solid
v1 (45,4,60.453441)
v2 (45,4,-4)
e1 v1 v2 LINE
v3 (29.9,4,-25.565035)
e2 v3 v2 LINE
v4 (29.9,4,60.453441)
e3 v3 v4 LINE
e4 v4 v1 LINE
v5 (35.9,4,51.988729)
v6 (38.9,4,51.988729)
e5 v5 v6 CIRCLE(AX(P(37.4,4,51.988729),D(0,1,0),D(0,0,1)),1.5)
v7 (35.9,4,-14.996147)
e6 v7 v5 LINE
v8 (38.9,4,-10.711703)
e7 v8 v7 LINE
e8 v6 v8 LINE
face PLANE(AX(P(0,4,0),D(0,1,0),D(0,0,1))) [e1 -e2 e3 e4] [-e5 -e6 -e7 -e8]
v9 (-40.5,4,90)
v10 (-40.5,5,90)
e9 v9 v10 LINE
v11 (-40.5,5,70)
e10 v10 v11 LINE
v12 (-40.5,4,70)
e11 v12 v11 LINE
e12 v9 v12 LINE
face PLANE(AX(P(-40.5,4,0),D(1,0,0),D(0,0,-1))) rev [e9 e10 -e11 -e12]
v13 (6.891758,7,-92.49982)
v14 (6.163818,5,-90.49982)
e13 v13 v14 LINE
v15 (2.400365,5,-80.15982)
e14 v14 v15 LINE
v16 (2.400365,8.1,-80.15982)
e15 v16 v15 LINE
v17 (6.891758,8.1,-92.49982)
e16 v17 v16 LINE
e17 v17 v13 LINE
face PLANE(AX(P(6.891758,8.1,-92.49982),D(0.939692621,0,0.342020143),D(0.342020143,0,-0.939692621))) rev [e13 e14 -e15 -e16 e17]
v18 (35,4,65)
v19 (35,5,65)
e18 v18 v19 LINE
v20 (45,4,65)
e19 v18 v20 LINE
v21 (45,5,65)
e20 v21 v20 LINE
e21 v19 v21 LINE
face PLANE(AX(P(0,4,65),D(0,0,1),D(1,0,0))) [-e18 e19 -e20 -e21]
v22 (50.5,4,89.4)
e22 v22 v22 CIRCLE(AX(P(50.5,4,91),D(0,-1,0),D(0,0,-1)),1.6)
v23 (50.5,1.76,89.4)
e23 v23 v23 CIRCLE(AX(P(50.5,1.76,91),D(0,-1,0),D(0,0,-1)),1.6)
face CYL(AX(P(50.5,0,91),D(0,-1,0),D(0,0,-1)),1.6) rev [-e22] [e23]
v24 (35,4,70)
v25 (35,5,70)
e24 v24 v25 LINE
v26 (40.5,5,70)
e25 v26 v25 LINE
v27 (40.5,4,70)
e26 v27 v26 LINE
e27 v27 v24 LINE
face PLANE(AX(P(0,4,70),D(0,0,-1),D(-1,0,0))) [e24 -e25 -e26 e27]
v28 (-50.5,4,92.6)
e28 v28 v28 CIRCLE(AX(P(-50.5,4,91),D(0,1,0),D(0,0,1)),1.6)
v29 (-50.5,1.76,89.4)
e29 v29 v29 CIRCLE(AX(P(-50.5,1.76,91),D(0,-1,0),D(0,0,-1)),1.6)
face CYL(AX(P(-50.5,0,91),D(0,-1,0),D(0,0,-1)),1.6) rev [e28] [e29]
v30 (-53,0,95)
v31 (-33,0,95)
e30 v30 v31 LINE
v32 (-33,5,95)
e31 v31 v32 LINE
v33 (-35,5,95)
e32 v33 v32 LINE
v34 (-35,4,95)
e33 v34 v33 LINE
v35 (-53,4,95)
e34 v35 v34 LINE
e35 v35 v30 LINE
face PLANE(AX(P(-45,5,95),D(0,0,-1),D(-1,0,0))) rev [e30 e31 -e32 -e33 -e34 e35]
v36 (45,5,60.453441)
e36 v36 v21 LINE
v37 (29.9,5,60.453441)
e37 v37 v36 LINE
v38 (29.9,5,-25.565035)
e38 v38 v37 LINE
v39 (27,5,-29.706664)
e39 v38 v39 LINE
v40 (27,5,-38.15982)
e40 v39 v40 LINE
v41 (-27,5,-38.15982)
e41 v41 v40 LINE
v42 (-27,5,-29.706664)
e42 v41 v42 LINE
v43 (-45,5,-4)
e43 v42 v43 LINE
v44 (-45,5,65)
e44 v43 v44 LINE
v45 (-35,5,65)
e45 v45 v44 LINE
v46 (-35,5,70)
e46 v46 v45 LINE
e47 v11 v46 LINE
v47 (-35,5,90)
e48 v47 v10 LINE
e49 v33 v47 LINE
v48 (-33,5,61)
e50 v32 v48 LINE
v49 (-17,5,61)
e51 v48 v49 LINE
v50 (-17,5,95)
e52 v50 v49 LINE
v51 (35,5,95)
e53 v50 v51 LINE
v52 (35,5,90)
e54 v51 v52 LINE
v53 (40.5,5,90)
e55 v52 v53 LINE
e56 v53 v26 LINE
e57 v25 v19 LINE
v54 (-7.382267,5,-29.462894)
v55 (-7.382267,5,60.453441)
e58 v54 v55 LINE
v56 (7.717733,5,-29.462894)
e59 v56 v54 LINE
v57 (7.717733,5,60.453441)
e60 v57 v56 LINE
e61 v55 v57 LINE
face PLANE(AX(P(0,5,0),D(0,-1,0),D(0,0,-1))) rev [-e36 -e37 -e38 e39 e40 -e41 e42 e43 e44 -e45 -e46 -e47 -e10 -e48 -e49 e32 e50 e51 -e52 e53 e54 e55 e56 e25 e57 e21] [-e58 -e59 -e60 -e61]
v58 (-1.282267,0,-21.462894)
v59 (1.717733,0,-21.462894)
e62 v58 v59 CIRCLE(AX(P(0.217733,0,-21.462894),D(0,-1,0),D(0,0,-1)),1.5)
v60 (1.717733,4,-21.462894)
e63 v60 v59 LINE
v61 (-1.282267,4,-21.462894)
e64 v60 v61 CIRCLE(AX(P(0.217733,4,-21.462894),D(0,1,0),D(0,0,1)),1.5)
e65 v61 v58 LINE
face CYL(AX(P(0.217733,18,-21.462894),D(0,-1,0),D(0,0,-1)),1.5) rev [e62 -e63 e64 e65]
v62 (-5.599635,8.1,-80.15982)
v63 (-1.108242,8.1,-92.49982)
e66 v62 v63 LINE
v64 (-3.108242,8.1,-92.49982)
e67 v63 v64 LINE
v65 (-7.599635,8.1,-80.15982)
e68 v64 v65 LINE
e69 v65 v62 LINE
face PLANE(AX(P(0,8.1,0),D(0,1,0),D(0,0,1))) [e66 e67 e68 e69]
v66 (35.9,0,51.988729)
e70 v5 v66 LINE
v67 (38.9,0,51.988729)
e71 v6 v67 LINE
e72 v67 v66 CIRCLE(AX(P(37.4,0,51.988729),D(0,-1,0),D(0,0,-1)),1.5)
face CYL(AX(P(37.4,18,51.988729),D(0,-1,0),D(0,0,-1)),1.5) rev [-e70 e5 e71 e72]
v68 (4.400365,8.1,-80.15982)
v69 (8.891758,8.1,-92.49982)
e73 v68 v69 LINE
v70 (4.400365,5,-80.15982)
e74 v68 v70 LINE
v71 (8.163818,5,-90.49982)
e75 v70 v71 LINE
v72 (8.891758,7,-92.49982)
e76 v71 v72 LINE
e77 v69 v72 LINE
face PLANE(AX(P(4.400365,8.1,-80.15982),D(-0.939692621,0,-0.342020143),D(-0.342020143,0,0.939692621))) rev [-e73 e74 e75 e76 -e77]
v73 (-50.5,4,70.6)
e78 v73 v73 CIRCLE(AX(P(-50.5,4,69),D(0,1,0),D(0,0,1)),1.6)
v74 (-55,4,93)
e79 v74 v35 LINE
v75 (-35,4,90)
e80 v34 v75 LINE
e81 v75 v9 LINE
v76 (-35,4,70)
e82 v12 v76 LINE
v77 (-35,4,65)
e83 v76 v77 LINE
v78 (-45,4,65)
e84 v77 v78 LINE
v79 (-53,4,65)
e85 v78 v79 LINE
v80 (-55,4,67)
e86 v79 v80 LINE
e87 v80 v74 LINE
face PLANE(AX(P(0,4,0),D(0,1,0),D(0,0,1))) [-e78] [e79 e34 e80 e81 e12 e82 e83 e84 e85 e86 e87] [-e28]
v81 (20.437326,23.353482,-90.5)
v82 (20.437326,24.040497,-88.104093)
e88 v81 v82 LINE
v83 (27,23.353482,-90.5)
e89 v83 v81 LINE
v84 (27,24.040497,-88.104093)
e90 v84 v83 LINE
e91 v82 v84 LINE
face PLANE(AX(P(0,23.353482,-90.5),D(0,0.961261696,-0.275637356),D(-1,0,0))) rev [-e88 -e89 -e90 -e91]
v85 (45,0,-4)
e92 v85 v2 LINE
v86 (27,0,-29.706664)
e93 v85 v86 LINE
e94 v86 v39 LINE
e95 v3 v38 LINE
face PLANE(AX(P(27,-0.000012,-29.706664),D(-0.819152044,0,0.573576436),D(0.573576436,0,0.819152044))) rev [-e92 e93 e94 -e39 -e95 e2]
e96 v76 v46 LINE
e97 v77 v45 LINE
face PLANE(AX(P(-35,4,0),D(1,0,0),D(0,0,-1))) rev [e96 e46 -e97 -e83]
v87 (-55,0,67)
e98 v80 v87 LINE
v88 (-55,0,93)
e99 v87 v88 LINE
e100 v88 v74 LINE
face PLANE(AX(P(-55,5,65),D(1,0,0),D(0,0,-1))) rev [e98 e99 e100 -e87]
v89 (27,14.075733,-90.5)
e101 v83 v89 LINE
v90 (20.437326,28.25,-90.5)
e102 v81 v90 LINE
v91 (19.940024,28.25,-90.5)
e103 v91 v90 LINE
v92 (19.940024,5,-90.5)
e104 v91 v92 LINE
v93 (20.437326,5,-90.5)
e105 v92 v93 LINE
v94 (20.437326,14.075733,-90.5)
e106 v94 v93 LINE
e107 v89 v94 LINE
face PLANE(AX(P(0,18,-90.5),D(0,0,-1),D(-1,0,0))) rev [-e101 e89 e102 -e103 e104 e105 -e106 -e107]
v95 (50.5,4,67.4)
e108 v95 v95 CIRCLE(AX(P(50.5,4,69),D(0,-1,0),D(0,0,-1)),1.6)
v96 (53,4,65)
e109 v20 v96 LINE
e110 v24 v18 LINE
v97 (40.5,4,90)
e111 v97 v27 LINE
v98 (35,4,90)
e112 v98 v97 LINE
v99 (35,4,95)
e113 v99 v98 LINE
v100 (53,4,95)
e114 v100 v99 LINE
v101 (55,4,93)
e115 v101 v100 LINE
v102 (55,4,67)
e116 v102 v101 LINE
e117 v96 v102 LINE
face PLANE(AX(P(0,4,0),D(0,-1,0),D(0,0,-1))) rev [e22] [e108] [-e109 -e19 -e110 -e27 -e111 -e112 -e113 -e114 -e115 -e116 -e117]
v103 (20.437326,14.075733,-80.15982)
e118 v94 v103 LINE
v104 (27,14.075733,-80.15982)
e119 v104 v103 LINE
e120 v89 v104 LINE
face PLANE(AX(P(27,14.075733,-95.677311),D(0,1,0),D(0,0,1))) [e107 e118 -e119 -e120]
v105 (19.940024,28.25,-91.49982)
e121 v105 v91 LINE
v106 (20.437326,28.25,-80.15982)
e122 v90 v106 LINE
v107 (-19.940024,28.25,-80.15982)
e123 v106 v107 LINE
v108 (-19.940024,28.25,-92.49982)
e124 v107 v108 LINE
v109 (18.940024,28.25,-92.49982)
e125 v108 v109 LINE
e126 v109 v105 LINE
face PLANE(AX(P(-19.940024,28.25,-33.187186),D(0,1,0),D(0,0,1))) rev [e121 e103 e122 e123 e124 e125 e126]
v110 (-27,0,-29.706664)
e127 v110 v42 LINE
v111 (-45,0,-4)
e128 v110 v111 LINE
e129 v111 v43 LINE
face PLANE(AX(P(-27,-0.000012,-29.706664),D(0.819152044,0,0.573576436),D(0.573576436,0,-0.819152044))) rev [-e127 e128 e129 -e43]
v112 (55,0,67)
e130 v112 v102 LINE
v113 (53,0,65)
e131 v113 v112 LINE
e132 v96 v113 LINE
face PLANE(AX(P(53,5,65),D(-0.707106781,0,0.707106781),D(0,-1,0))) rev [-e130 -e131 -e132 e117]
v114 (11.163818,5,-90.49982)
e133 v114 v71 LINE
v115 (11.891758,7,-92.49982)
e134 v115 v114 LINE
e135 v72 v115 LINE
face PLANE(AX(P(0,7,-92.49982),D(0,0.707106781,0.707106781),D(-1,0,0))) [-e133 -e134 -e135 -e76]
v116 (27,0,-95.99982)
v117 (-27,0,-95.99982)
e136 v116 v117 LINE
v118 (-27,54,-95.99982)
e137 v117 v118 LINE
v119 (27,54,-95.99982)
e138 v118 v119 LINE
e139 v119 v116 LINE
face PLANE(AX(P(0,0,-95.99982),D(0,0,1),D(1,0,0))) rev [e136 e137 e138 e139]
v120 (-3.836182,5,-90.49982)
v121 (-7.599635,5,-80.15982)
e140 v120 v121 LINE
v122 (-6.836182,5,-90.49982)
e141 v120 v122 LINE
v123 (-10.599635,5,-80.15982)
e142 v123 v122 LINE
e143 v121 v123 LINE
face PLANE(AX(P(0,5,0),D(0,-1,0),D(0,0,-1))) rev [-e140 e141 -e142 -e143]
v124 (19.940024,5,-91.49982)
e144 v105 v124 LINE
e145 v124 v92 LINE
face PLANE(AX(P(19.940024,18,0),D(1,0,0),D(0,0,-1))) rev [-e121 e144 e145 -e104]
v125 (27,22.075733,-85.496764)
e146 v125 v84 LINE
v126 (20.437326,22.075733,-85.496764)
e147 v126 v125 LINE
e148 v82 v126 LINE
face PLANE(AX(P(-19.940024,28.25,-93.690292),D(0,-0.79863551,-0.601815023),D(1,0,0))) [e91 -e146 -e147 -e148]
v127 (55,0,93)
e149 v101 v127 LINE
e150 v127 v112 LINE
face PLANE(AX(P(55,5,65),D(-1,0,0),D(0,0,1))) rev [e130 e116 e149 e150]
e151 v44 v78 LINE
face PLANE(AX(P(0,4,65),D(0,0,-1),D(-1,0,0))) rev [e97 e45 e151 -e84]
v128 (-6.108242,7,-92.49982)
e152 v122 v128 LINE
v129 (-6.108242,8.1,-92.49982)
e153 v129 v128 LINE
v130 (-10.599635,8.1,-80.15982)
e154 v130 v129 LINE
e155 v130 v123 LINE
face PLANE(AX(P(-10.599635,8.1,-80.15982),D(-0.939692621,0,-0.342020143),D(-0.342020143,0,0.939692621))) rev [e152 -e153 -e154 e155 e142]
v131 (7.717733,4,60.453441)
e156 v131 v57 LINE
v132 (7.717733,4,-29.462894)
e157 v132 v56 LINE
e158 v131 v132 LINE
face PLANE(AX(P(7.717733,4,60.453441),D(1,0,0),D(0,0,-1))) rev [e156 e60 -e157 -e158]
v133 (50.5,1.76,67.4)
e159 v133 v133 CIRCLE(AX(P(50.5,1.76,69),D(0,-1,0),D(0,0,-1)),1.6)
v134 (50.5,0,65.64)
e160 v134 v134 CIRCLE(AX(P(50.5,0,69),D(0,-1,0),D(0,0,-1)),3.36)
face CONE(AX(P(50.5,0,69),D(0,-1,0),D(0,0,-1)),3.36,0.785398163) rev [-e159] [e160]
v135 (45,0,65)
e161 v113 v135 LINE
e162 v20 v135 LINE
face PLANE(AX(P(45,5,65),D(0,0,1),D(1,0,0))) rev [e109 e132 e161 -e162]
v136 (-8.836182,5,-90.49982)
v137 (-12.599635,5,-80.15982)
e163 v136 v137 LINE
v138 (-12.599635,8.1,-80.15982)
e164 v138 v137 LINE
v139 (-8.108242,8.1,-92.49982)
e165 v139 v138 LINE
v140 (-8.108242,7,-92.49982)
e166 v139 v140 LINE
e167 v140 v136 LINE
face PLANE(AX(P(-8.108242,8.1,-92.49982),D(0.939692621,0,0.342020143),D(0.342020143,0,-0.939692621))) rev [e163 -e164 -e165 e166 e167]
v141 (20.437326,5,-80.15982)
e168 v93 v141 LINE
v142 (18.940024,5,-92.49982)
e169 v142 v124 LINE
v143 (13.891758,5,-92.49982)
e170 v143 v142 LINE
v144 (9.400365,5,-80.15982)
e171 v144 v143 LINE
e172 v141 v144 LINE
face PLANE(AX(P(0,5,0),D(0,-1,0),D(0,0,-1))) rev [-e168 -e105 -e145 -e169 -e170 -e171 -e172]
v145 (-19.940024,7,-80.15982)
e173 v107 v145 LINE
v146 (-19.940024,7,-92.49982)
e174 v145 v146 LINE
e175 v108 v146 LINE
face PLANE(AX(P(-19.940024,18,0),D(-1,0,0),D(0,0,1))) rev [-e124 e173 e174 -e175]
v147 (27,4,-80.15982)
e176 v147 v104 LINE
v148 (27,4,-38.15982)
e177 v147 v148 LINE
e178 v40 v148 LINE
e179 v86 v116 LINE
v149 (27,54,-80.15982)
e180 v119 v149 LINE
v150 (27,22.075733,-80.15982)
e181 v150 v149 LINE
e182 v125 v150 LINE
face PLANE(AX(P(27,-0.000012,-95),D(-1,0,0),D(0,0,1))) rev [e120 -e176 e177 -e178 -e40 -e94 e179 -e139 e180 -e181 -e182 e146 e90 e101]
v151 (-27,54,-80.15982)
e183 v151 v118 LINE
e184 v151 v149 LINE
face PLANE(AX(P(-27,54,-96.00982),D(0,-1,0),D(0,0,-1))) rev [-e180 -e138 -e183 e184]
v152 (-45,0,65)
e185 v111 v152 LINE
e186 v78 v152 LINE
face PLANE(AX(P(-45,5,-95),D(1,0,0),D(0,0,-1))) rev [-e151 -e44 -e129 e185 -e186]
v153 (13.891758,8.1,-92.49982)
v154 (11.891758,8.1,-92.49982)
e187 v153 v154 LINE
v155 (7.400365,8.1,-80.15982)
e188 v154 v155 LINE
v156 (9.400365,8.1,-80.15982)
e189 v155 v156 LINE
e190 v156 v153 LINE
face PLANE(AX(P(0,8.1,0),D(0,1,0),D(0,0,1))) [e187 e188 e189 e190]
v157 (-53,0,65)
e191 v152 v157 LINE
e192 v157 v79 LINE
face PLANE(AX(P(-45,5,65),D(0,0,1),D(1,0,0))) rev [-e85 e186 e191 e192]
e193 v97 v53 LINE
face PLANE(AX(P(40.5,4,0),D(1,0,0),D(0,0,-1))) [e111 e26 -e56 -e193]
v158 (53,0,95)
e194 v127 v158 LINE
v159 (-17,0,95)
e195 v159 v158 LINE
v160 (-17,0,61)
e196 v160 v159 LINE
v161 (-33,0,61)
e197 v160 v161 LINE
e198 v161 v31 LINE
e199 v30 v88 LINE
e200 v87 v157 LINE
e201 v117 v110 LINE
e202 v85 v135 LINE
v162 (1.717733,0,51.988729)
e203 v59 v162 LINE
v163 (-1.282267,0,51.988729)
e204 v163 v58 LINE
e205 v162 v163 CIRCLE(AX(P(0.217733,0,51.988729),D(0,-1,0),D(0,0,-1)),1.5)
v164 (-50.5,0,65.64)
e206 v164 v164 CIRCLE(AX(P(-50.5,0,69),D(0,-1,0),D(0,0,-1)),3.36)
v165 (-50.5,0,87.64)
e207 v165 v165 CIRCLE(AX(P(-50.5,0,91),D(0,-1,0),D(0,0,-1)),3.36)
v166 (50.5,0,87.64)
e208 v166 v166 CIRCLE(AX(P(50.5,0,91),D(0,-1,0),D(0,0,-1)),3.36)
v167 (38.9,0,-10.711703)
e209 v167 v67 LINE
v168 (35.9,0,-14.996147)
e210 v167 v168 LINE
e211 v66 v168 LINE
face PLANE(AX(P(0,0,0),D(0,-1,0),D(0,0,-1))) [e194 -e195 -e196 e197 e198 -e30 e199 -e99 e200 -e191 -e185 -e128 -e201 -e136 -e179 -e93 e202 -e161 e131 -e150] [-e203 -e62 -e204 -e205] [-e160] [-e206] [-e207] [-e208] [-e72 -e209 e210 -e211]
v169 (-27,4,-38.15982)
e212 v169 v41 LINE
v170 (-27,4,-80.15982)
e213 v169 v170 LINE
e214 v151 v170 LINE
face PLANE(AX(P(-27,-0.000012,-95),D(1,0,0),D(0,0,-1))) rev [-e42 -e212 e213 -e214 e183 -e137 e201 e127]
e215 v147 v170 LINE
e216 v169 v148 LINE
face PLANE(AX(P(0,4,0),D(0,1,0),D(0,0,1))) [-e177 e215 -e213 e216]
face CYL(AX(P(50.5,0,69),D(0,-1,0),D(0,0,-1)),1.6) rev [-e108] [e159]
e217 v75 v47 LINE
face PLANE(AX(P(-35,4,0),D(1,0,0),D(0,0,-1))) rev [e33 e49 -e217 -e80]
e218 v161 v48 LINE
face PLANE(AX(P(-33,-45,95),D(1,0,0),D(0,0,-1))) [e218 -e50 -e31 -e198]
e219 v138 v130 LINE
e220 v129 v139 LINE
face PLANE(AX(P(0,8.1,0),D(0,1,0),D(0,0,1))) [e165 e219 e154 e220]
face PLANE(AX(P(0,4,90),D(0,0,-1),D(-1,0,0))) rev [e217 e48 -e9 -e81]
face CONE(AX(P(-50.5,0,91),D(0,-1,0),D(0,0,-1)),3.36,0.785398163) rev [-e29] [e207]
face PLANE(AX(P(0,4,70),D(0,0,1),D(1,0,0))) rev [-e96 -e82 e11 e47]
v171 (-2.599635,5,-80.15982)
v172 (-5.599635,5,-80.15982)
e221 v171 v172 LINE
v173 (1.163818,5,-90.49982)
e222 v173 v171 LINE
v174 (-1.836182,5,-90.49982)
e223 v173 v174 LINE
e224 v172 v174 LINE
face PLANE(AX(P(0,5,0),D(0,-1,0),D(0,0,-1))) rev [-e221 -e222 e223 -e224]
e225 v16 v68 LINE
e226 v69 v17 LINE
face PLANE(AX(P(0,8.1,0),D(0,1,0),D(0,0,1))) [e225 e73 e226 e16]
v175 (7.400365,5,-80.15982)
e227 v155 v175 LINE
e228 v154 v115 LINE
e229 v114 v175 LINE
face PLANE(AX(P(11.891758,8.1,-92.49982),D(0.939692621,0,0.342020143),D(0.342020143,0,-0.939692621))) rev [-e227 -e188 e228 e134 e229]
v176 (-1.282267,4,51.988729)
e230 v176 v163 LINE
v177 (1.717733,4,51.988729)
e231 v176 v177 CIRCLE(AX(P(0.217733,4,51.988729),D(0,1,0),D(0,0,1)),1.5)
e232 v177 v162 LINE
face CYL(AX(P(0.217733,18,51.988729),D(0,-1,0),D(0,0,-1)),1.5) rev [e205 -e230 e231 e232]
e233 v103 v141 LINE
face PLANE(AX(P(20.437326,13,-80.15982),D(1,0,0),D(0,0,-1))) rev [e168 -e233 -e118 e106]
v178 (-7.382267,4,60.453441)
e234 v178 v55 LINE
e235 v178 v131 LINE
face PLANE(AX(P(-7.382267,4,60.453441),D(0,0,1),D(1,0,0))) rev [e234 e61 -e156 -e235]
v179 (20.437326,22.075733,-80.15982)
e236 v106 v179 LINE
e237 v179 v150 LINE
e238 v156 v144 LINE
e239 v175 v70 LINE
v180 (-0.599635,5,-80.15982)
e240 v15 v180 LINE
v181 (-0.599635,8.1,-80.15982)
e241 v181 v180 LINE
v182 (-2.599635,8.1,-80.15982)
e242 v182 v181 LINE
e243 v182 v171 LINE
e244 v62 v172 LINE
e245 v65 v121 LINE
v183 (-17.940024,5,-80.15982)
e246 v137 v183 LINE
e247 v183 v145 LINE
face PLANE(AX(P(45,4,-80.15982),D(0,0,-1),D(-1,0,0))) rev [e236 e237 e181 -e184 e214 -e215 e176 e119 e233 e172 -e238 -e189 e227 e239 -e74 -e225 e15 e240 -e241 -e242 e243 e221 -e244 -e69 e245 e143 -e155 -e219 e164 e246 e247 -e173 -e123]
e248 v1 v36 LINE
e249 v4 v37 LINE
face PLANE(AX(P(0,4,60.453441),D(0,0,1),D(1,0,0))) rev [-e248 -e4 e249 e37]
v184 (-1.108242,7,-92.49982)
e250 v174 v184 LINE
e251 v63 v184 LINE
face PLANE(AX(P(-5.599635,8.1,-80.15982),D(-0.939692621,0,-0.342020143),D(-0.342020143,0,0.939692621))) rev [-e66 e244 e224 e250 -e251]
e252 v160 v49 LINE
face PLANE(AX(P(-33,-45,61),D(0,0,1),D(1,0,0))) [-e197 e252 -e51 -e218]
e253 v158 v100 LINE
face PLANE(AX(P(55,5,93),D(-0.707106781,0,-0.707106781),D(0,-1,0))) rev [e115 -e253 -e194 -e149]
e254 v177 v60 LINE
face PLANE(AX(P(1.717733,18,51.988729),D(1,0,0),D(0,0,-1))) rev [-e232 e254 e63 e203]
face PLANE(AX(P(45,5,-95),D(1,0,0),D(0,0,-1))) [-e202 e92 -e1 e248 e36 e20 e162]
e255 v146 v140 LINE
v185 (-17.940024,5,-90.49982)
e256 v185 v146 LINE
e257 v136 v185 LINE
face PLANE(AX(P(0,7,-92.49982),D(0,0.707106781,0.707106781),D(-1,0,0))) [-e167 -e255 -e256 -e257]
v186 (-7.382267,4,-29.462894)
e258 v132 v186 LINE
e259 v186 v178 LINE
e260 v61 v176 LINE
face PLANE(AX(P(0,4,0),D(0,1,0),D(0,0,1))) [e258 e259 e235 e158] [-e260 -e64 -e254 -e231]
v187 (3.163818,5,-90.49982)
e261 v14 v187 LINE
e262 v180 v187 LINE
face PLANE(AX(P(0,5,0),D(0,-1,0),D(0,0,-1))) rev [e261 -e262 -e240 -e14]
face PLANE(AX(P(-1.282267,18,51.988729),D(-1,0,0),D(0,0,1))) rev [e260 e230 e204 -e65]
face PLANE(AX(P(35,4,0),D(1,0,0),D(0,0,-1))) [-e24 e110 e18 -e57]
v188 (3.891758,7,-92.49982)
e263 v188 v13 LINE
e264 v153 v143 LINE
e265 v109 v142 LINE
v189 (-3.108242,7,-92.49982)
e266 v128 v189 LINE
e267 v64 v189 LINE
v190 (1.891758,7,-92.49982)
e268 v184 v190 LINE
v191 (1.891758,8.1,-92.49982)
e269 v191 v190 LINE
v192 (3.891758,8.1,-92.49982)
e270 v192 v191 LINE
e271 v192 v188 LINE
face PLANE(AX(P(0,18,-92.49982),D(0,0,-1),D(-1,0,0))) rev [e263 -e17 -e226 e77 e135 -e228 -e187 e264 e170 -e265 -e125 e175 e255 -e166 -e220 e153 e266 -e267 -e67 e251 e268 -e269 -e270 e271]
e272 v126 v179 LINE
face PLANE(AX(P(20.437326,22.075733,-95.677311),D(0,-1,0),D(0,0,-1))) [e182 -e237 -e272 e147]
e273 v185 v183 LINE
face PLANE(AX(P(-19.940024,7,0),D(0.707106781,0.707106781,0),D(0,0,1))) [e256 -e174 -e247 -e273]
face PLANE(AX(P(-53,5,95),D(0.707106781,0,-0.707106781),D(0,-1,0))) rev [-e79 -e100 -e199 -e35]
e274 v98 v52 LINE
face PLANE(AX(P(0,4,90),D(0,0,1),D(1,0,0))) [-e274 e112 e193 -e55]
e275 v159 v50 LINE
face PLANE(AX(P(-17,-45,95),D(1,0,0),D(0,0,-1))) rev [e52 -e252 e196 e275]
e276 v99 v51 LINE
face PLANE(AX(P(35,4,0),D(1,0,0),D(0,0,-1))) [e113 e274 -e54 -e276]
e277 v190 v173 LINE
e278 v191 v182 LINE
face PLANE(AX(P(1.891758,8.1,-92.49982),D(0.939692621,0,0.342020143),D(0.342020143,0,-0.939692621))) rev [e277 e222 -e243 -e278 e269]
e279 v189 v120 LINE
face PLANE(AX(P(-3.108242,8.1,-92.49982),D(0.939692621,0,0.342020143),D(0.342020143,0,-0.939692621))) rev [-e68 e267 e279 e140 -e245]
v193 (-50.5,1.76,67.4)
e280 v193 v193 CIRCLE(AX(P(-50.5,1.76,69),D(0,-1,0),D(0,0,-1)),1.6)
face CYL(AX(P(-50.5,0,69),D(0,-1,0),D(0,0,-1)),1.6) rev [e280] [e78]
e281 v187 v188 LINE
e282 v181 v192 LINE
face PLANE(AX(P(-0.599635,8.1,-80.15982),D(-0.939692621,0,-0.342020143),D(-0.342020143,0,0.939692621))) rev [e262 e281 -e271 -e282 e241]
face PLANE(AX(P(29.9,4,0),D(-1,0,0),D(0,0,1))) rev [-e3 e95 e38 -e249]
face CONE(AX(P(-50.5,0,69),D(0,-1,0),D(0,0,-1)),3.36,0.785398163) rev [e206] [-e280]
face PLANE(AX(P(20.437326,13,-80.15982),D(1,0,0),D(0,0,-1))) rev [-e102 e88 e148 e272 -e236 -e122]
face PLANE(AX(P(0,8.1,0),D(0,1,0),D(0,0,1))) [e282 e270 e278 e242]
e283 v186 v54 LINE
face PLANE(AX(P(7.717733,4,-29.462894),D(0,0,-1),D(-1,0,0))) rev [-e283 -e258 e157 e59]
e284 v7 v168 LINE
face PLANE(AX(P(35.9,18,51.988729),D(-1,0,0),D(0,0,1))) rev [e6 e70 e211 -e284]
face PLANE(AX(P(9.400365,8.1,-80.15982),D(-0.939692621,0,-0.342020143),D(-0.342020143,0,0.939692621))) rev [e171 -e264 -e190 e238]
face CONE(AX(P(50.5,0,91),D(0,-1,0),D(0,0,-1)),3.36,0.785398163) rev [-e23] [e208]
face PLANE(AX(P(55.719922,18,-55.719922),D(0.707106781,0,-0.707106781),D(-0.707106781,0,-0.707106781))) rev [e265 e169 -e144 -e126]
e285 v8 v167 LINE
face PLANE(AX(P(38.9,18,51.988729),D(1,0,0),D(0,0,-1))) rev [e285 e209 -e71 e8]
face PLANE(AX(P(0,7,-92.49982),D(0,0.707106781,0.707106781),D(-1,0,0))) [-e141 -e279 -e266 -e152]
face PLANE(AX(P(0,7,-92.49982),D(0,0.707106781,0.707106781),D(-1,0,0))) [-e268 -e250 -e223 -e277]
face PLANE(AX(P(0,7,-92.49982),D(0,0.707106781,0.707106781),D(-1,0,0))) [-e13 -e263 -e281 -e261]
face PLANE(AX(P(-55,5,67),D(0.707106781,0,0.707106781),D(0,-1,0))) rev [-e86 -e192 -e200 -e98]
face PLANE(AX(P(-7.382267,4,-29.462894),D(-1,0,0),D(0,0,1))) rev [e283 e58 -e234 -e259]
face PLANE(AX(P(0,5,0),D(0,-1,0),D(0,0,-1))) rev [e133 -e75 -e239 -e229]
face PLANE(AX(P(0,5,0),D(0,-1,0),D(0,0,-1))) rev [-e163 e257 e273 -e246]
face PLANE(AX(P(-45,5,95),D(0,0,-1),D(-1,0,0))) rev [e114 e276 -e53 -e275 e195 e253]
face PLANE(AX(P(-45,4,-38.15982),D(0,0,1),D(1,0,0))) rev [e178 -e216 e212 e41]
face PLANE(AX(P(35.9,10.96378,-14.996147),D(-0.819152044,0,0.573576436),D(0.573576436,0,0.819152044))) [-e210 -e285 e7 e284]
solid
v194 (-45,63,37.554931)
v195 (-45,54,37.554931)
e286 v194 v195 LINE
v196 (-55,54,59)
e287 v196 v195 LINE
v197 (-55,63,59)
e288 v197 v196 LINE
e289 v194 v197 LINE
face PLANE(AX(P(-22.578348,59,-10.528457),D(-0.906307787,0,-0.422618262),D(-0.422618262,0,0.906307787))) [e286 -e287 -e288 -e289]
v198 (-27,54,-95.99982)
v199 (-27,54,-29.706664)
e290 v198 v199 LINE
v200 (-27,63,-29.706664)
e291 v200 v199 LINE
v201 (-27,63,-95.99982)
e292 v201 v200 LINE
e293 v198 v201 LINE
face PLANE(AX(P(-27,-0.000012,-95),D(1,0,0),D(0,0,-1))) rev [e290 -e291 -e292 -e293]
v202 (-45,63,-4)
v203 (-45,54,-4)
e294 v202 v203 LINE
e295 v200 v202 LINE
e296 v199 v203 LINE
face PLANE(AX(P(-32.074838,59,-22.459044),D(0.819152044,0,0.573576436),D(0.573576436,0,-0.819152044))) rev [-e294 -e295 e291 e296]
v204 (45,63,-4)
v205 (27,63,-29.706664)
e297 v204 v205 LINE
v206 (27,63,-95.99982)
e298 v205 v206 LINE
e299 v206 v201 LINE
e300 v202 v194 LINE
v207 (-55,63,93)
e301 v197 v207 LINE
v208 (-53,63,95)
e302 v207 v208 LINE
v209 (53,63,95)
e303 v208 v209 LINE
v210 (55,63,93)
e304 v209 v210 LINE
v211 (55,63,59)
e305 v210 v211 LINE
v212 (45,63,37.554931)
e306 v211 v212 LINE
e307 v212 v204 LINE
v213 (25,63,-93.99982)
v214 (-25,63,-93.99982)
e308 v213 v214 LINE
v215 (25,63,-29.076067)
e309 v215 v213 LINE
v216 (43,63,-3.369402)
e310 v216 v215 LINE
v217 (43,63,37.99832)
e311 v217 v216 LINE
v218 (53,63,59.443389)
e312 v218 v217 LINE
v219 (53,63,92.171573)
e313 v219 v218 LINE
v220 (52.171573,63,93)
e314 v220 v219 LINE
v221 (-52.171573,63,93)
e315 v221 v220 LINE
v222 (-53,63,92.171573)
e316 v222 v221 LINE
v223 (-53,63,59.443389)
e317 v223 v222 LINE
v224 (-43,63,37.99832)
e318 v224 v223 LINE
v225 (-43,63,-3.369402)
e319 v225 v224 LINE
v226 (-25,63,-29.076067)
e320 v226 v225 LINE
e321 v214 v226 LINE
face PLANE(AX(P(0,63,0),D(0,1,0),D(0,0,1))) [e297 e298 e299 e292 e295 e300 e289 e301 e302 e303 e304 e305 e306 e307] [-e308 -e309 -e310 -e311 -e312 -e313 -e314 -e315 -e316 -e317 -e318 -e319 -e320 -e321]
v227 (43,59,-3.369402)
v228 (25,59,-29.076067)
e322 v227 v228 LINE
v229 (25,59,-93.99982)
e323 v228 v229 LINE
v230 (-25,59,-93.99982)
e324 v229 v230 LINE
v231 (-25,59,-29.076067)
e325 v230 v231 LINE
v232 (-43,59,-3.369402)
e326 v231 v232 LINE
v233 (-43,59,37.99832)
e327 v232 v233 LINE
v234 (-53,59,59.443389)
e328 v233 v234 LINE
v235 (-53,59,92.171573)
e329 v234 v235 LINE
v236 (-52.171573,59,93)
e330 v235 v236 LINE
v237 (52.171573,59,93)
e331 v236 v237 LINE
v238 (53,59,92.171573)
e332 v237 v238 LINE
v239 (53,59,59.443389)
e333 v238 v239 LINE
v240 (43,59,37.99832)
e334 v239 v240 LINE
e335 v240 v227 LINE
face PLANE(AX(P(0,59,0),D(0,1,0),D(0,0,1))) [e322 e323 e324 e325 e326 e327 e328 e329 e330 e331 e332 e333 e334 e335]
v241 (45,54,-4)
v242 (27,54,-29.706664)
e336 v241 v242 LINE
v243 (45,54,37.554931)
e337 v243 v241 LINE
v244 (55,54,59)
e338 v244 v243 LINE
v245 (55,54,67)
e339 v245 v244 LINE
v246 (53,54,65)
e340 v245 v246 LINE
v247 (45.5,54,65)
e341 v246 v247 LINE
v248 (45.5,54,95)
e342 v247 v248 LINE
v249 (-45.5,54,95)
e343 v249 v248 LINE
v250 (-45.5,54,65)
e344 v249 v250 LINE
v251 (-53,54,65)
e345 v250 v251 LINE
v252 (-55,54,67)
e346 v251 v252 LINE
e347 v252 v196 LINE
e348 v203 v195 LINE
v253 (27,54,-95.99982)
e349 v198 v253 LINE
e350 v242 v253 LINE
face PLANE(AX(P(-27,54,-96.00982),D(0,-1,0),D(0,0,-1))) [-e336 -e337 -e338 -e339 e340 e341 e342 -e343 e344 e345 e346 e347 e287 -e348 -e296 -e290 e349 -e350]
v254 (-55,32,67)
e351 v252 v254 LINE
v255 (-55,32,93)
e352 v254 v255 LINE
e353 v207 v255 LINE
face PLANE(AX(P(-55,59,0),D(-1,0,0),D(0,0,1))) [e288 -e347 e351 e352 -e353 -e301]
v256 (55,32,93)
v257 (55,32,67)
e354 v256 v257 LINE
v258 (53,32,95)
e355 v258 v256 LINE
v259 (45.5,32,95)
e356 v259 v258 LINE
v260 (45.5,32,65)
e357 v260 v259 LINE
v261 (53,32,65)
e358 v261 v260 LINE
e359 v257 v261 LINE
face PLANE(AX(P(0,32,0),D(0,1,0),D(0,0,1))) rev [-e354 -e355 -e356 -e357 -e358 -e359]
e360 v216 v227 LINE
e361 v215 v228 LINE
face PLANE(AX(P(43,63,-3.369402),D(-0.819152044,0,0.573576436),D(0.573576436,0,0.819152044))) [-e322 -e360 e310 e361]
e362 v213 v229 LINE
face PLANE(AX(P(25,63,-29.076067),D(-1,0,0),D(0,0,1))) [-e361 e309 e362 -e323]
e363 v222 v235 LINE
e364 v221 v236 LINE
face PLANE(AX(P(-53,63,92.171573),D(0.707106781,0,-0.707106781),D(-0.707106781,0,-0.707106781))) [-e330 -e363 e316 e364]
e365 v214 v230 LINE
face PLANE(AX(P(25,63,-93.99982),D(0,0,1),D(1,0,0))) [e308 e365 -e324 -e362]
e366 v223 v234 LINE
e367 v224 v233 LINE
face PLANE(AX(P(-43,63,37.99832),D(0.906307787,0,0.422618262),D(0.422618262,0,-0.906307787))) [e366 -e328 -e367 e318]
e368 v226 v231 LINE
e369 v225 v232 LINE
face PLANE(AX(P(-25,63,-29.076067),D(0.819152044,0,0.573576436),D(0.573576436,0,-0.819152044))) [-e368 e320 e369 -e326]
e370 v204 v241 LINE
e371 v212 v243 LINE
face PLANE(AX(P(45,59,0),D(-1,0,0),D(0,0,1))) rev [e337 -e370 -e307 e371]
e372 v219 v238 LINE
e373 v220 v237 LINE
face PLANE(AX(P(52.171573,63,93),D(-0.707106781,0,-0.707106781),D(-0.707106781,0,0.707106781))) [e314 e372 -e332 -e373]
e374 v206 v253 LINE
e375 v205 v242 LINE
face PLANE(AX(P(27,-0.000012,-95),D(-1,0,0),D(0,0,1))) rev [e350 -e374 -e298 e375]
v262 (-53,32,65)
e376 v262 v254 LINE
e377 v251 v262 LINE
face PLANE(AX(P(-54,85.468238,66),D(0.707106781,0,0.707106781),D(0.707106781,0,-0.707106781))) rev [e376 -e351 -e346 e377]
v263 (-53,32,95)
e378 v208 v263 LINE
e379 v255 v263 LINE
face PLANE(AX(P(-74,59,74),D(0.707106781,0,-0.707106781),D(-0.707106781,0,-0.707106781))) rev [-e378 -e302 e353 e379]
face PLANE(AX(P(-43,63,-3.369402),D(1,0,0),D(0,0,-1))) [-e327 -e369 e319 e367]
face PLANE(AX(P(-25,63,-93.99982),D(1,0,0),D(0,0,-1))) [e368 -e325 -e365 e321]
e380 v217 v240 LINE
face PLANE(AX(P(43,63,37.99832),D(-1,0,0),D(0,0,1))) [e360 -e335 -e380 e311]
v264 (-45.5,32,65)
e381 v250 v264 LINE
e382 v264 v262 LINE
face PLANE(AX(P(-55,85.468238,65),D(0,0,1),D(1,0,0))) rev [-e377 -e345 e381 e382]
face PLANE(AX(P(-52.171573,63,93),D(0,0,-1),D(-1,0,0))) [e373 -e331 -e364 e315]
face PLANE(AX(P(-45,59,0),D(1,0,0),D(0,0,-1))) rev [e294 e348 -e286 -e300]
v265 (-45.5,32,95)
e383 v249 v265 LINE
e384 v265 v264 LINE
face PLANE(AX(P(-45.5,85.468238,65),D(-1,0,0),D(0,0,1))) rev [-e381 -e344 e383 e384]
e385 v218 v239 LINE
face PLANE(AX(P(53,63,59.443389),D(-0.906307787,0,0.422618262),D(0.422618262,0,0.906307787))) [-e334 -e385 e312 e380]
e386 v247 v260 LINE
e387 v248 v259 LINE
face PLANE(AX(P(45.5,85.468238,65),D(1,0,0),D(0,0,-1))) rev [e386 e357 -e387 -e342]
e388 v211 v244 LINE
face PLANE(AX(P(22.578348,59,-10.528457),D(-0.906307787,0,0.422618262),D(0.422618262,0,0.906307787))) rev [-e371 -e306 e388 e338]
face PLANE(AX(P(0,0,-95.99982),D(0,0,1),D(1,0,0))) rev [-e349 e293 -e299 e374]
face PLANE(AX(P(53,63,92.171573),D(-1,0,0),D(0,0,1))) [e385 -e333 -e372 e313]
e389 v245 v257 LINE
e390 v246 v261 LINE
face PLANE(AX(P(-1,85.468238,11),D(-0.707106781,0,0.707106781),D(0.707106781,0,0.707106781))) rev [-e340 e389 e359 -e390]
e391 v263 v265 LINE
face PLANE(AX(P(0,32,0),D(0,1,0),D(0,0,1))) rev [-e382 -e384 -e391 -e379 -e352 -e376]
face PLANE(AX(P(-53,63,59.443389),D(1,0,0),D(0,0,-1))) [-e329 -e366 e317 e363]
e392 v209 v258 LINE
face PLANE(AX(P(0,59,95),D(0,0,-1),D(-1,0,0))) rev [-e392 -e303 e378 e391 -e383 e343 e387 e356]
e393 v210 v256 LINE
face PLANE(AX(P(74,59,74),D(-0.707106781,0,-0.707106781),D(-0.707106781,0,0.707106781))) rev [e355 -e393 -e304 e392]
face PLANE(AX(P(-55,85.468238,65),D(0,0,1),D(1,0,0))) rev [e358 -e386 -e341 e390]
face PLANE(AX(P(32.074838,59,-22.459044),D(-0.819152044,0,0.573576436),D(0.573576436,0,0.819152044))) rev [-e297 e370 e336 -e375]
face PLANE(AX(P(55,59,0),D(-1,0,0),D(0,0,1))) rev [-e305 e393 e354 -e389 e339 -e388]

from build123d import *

# Parameters (mm, degrees)
SKETCH1_W                    = 90
SKETCH1_H                    = 190
BOSS_EXTRUDE1_DEPTH          = 5
SKETCH2_W                    = 10
SKETCH2_H                    = 30
BOSS_EXTRUDE2_DEPTH          = 5
CHAMFER1_SIZE                = 2
SKETCH3_W                    = 16
SKETCH3_H                    = 34
CUT_EXTRUDE1_DEPTH           = 50
SKETCH4_W                    = 90
SKETCH4_H                    = 42
CUT_EXTRUDE2_DEPTH           = 1
SKETCH7_W                    = 15.1
SKETCH7_H                    = 89.916335477
CUT_EXTRUDE7_DEPTH           = 1
BOSS_EXTRUDE4_START          = 5
BOSS_EXTRUDE4_DEPTH          = 13
BOSS_EXTRUDE5_DEPTH          = 3.1
CUT_EXTRUDE11_START          = 5
CUT_EXTRUDE11_DEPTH          = 1
CUT_EXTRUDE12_DEPTH          = 112.23848255
CUT_EXTRUDE12_DEPTH_BACK     = 112.23848255
BOSS_EXTRUDE6_DEPTH          = 1
CHAMFER4_SIZE                = 2
CUT_EXTRUDE13_REACH          = 114.094
SKETCH23_R                   = 1.5
CUT_EXTRUDE14_DEPTH          = 113.093556715
CUT_EXTRUDE14_DEPTH_BACK     = 113.093556715
SKETCH27_W                   = 2.002698481
SKETCH27_H                   = 10.340179912
BOSS_EXTRUDE7_DEPTH          = 8
BOSS_EXTRUDE10_DEPTH         = 8
BOSS_EXTRUDE11_OUTLINE_W     = 4.559976017
BOSS_EXTRUDE11_OUTLINE_H     = 15.84
BOSS_EXTRUDE11_DEPTH         = 13
BOSS_EXTRUDE12_DEPTH         = 12
SKETCH34_W                   = 46.940023983
SKETCH34_H                   = 1.75
BOSS_EXTRUDE13_DEPTH         = 12.34
SKETCH35_W                   = 6.562674498
SKETCH35_H                   = 5.170089956
BOSS_EXTRUDE14_DEPTH         = 15.25
SKETCH36_W                   = 6.562674498
SKETCH36_H                   = 8
CUT_EXTRUDE15_DEPTH          = 5.170089956
CHAMFER5_SIZE                = 8.360382376
CHAMFER5_SIZE_2              = 6.3
CHAMFER6_SIZE                = 3
CHAMFER6_SIZE2               = 2.492460212
SKETCH37_W                   = 6.562674498
SKETCH37_H                   = 5.170089956
BOSS_EXTRUDE15_DEPTH         = 1.075733433
BOSS_EXTRUDE16_START         = 24
BOSS_EXTRUDE16_DEPTH         = 5
BOSS_EXTRUDE17_DEPTH         = 4
SKETCH40_W                   = 54
SKETCH40_H                   = 15.84
BOSS_EXTRUDE18_DEPTH         = 24
BOSS_EXTRUDE19_START         = 32
BOSS_EXTRUDE19_DEPTH         = 22
SPLIT1_START                 = 54
SPLIT1_DEPTH                 = 5
SPLIT1_START_2               = 32
SPLIT1_2_DEPTH               = 22
SPLIT1_START_3               = 59
SPLIT1_3_DEPTH               = 4
SPLIT1_4_DEPTH               = 9
SPLIT1_5_DEPTH               = 22
BOSS_EXTRUDE20_DEPTH         = 4
CSK_FOR_M3_SFHCS1_AT_2_COUNT = 2
CSK_FOR_M3_SFHCS1_AT_2_PITCH = 22
CSK_FOR_M3_SFHCS1_AT_3_COUNT = 2
CSK_FOR_M3_SFHCS1_AT_3_PITCH = 103.368273663
CSK_FOR_M3_SFHCS1_AT_4_COUNT = 2
CSK_FOR_M3_SFHCS1_AT_4_PITCH = 101


# Read off the part's stored shape, not the designer's step: Boss-Extrude11, Split1
with BuildPart() as part:
    # Sketch1 → Boss-Extrude1 (new body)
    with BuildSketch(Plane(origin=(0, 0, 0), x_dir=(1, 0, 0), z_dir=(0, 1, 0))):
        Rectangle(SKETCH1_W, SKETCH1_H)
    extrude(amount=BOSS_EXTRUDE1_DEPTH)

    # Sketch2 → Boss-Extrude2 (add)
    with BuildSketch(Plane(origin=(0, 0, 0), x_dir=(1, 0, 0), z_dir=(0, 1, 0))):
        with Locations((-50, -80)):
            Rectangle(SKETCH2_W, SKETCH2_H)
        with Locations((50, -80)):
            Rectangle(SKETCH2_W, SKETCH2_H)
    extrude(amount=BOSS_EXTRUDE2_DEPTH)

    # Chamfer1
    chamfer1_edges = [part.edges().sort_by_distance(p)[0] for p in [
        (-55, 2.5, 65),
        (-55, 2.5, 95),
        (55, 2.5, 95),
        (55, 2.5, 65),
    ]]
    chamfer(chamfer1_edges, length=CHAMFER1_SIZE)

    # Sketch3 → Cut-Extrude1 (cut)
    with BuildSketch(Plane(origin=(0, 5, 0), x_dir=(1, 0, 0), z_dir=(0, 1, 0))):
        with Locations((-25, -78)):
            Rectangle(SKETCH3_W, SKETCH3_H)
    extrude(amount=-CUT_EXTRUDE1_DEPTH, mode=Mode.SUBTRACT)

    # Sketch4 → Cut-Extrude2 (cut)
    with BuildSketch(Plane(origin=(0, 5, 0), x_dir=(1, 0, 0), z_dir=(0, 1, 0))):
        with Locations((0, 59.159820088)):
            Rectangle(SKETCH4_W, SKETCH4_H)
    extrude(amount=-CUT_EXTRUDE2_DEPTH, mode=Mode.SUBTRACT)

    # Sketch7 → Cut-Extrude7 (cut)
    with BuildSketch(Plane(origin=(0, 5, 0), x_dir=(1, 0, 0), z_dir=(0, 1, 0))):
        with Locations((37.45, -15.495273531)):
            Rectangle(SKETCH7_W, SKETCH7_H)
        with Locations((0.16773297, -15.495273531)):
            Rectangle(SKETCH7_W, SKETCH7_H)
    extrude(amount=-CUT_EXTRUDE7_DEPTH, mode=Mode.SUBTRACT)

    # Sketch17 → Boss-Extrude4 (add)
    with BuildSketch(Plane(origin=(0, 0, 0), x_dir=(1, 0, 0), z_dir=(0, 1, 0)).offset(BOSS_EXTRUDE4_START)):
        Polygon((-22.440023983, 80.159820088), (-19.940023983, 80.159820088), (-19.940023983, 92.499820088), (18.940023983, 92.499820088), (19.940023983, 91.499820088), (19.940023983, 90.5), (22.440023983, 90.5), (22.440023983, 92.535353994), (19.975557889, 94.999820088), (-22.440023983, 94.999820088), align=None)
    extrude(amount=BOSS_EXTRUDE4_DEPTH)

    # Sketch18 → Boss-Extrude5 (add)
    with BuildSketch(Plane(origin=(0, 5, 0), x_dir=(1, 0, 0), z_dir=(0, 1, 0))):
        Polygon((-12.599634528, 80.159820088), (-10.599634528, 80.159820088), (-6.108241837, 92.499820088), (-8.108241837, 92.499820088), align=None)
        Polygon((-3.108241837, 92.499820088), (-7.599634528, 80.159820088), (-5.599634528, 80.159820088), (-1.108241837, 92.499820088), align=None)
        Polygon((1.891758163, 92.499820088), (-2.599634528, 80.159820088), (-0.599634528, 80.159820088), (3.891758163, 92.499820088), align=None)
        Polygon((6.891758163, 92.499820088), (2.400365472, 80.159820088), (4.400365472, 80.159820088), (8.891758163, 92.499820088), align=None)
        Polygon((11.891758163, 92.499820088), (7.400365472, 80.159820088), (9.400365472, 80.159820088), (13.891758163, 92.499820088), align=None)
    extrude(amount=BOSS_EXTRUDE5_DEPTH)

    # Sketch19 → Cut-Extrude11 (cut)
    with BuildSketch(Plane(origin=(0, 0, 0), x_dir=(1, 0, 0), z_dir=(0, 1, 0)).offset(CUT_EXTRUDE11_START)):
        Polygon((-35, -65), (-35, -70), (-40.5, -70), (-40.5, -90), (-35, -90), (-35, -95), (-53, -95), (-55, -93), (-55, -67), (-53, -65), align=None)
    cut_extrude11 = extrude(amount=-CUT_EXTRUDE11_DEPTH, mode=Mode.SUBTRACT)

    # Mirror1: Cut-Extrude11 across plane
    add(cut_extrude11.mirror(Plane(origin=(0, 0, 0), x_dir=(0, 0, 1), z_dir=(1, 0, 0))), mode=Mode.SUBTRACT)

    # Sketch20 → Cut-Extrude12 (cut, two sides: drawn at the far end of the back side and taken through both)
    with BuildSketch(Plane(origin=(0, 0, 0), x_dir=(1, 0, 0), z_dir=(0, 1, 0)).offset(-CUT_EXTRUDE12_DEPTH_BACK)):
        Polygon((-27, 29.706664121), (-45, 4), (-45, 95), (-27, 95), align=None)
        Polygon((27, 95), (27, 29.706664121), (45, 4), (45, 95), align=None)
    extrude(amount=CUT_EXTRUDE12_DEPTH + CUT_EXTRUDE12_DEPTH_BACK, mode=Mode.SUBTRACT)

    # Sketch22 → Boss-Extrude6 (add)
    with BuildSketch(Plane(origin=(0, 0, -94.999820088), x_dir=(-1, 0, 0), z_dir=(0, 0, -1))):
        Polygon((-19.975557889, 5), (-27, 5), (-27, 0), (27, 0), (27, 5), (22.440023983, 5), (22.440023983, 18), (-19.975557889, 18), align=None)
    extrude(amount=BOSS_EXTRUDE6_DEPTH)

    # Chamfer4
    chamfer4_edges = [part.edges().sort_by_distance(p)[0] for p in [
        (-19.940023983, 5, -86.329820088),
        (-14.02413291, 5, -92.499820088),
        (-4.608241837, 5, -92.499820088),
        (0.391758163, 5, -92.499820088),
        (5.391758163, 5, -92.499820088),
        (10.391758163, 5, -92.499820088),
    ]]
    chamfer(chamfer4_edges, length=CHAMFER4_SIZE)

    # Sketch23 → Cut-Extrude13 (cut, up to next)
    with BuildSketch(Plane.XZ, mode=Mode.PRIVATE) as cut_extrude13_sk1:
        with Locations(Location((-50.5, 91, 0), (0, 0, 270))):
            Circle(SKETCH23_R)
    cut_extrude13_tool1 = extrude(cut_extrude13_sk1.sketch, amount=-CUT_EXTRUDE13_REACH, mode=Mode.PRIVATE) & part.part
    # Sketch23 → Cut-Extrude13 (cut, up to next)
    with BuildSketch(Plane.XZ, mode=Mode.PRIVATE) as cut_extrude13_sk2:
        with Locations(Location((-50.5, 69, 0), (0, 0, 270))):
            Circle(SKETCH23_R)
    cut_extrude13_tool2 = extrude(cut_extrude13_sk2.sketch, amount=-CUT_EXTRUDE13_REACH, mode=Mode.PRIVATE) & part.part
    # Sketch23 → Cut-Extrude13 (cut, up to next)
    with BuildSketch(Plane.XZ, mode=Mode.PRIVATE) as cut_extrude13_sk3:
        with Locations(Location((50.5, 69, 0), (0, 0, 270))):
            Circle(SKETCH23_R)
    cut_extrude13_tool3 = extrude(cut_extrude13_sk3.sketch, amount=-CUT_EXTRUDE13_REACH, mode=Mode.PRIVATE) & part.part
    # Sketch23 → Cut-Extrude13 (cut, up to next)
    with BuildSketch(Plane.XZ, mode=Mode.PRIVATE) as cut_extrude13_sk4:
        with Locations(Location((50.5, 91, 0), (0, 0, 270))):
            Circle(SKETCH23_R)
    cut_extrude13_tool4 = extrude(cut_extrude13_sk4.sketch, amount=-CUT_EXTRUDE13_REACH, mode=Mode.PRIVATE) & part.part
    add(cut_extrude13_tool1.solids().sort_by_distance((-50.5, 0, 91))[0], mode=Mode.SUBTRACT)
    add(cut_extrude13_tool2.solids().sort_by_distance((-50.5, 0, 69))[0], mode=Mode.SUBTRACT)
    add(cut_extrude13_tool3.solids().sort_by_distance((50.5, 0, 69))[0], mode=Mode.SUBTRACT)
    add(cut_extrude13_tool4.solids().sort_by_distance((50.5, 0, 91))[0], mode=Mode.SUBTRACT)

    # Sketch25 → Cut-Extrude14 (cut, two sides: drawn at the far end of the back side and taken through both)
    with BuildSketch(Plane.XZ.offset(-CUT_EXTRUDE14_DEPTH_BACK)):
        with BuildLine():
            Line((1.71773297, 51.988728589), (1.71773297, -21.462894208))
            ThreePointArc((1.71773297, -21.462894208), (0.21773297, -22.962894208), (-1.28226703, -21.462894208))
            Line((-1.28226703, -21.462894208), (-1.28226703, 51.988728589))
            ThreePointArc((-1.28226703, 51.988728589), (0.21773297, 53.488728589), (1.71773297, 51.988728589))
        make_face()
        with BuildLine():
            Line((38.9, 51.988728589), (38.9, -21.462894208))
            ThreePointArc((38.9, -21.462894208), (37.4, -22.962894208), (35.9, -21.462894208))
            Line((35.9, -21.462894208), (35.9, 51.988728589))
            ThreePointArc((35.9, 51.988728589), (37.4, 53.488728589), (38.9, 51.988728589))
        make_face()
    extrude(amount=CUT_EXTRUDE14_DEPTH + CUT_EXTRUDE14_DEPTH_BACK, mode=Mode.SUBTRACT)

    # Sketch27 → Boss-Extrude7 (add)
    with BuildSketch(Plane(origin=(0, 5, 0), x_dir=(1, 0, 0), z_dir=(0, 1, 0))):
        with Locations((21.438674742, 85.329910044)):
            Rectangle(SKETCH27_W, SKETCH27_H)
    extrude(amount=BOSS_EXTRUDE7_DEPTH)

    # Sketch31 → Boss-Extrude10 (add)
    with BuildSketch(Plane(origin=(0, 5, 0), x_dir=(1, 0, 0), z_dir=(0, 1, 0))):
        Polygon((22.440023983, 92.535353994), (22.440023983, 80.159820088), (27, 80.159820088), (27, 95.999820088), (19.975557889, 95.999820088), (19.975557889, 94.999820088), align=None)
    extrude(amount=BOSS_EXTRUDE10_DEPTH)

    # Boss-Extrude11 outline → Boss-Extrude11 (add)
    with BuildSketch(Plane(origin=(0, 5, 0), x_dir=(1, 0, 0), z_dir=(0, 1, 0))):
        Polygon((22.440023983, 90.5), (27, 90.5), (27, 95.999820088), (19.975557889, 95.999820088), (19.975557889, 94.999820088), (22.440023983, 92.535353994), align=None)
        with Locations((-24.720011992, 88.079820088)):
            Rectangle(BOSS_EXTRUDE11_OUTLINE_W, BOSS_EXTRUDE11_OUTLINE_H)
    extrude(amount=BOSS_EXTRUDE11_DEPTH)

    # Sketch33 → Boss-Extrude12 (add)
    with BuildSketch(Plane(origin=(0, 18, 0), x_dir=(1, 0, 0), z_dir=(0, 1, 0))):
        Polygon((19.940023983, 90.5), (27, 90.5), (27, 95.999820088), (-27, 95.999820088), (-27, 80.159820088), (-19.940023983, 80.159820088), (-19.940023983, 92.499820088), (18.940023983, 92.499820088), (19.940023983, 91.499820088), align=None)
    extrude(amount=BOSS_EXTRUDE12_DEPTH)

    # Sketch34 → Boss-Extrude13 (add)
    with BuildSketch(Plane.XY.offset(-92.499820088)):
        with Locations((3.529988009, 29.125)):
            Rectangle(SKETCH34_W, SKETCH34_H)
    extrude(amount=BOSS_EXTRUDE13_DEPTH)

    # Sketch35 → Boss-Extrude14 (add)
    with BuildSketch(Plane(origin=(0, 13, 0), x_dir=(1, 0, 0), z_dir=(0, 1, 0))):
        with Locations((23.718662751, 82.744865066)):
            Rectangle(SKETCH35_W, SKETCH35_H)
    extrude(amount=BOSS_EXTRUDE14_DEPTH)

    # Sketch36 → Cut-Extrude15 (cut)
    with BuildSketch(Plane.XY.offset(-80.159820088)):
        with Locations((23.718662751, 18.075733433)):
            Rectangle(SKETCH36_W, SKETCH36_H)
    extrude(amount=-CUT_EXTRUDE15_DEPTH, mode=Mode.SUBTRACT)

    # Chamfer5
    # the kernel refuses this chamfer: 8.360382376, 6.3 mm, written as the material it adds along each edge
    with BuildSketch(Plane(origin=(27, 28.25, -85.329910044), x_dir=(0, 0.023321052992756976, -0.9997280272590685), z_dir=(-1, 0, 0))) as chamfer5_piece_1_section:
        Polygon((CHAMFER5_SIZE * 0.999728027284, CHAMFER5_SIZE * 0.0233210529933), (-CHAMFER5_SIZE_2 * 0.0233210529928, CHAMFER5_SIZE_2 * 0.999728027259), (0, 0), align=None)
    chamfer5_piece_1 = extrude(amount=6.562674498, mode=Mode.PRIVATE)
    chamfer5_piece_1 = split(chamfer5_piece_1, bisect_by=Plane(origin=(25.118661311, 22.075733433, -88.202521449), z_dir=(0, 1, 0)), keep=Keep.TOP, mode=Mode.PRIVATE)
    add(chamfer5_piece_1)

    # Chamfer6
    chamfer6_edges = [part.edges().sort_by_distance(p)[0] for p in [
        (23.718662751, 25.845942226, -90.5),
    ]]
    chamfer6_side = [part.faces().sort_by_distance(p)[0] for p in [
        (23.718662751, 23.960837829, -87.998381973),
    ]]
    chamfer(chamfer6_edges, length=CHAMFER6_SIZE, length2=CHAMFER6_SIZE2, reference=chamfer6_side[0])

    # Sketch37 → Boss-Extrude15 (add)
    with BuildSketch(Plane(origin=(0, 13, 0), x_dir=(1, 0, 0), z_dir=(0, 1, 0))):
        with Locations((23.718662751, 87.914955022)):
            Rectangle(SKETCH37_W, SKETCH37_H)
    extrude(amount=BOSS_EXTRUDE15_DEPTH)



with BuildPart() as body_2:
    # Sketch38 → Boss-Extrude16 (new body)
    with BuildSketch(Plane(origin=(0, 30, 0), x_dir=(1, 0, 0), z_dir=(0, 1, 0)).offset(BOSS_EXTRUDE16_START)):
        Polygon((-55, -59), (-55, -93), (-53, -95), (53, -95), (55, -93), (55, -59), (45, -37.554930795), (45, 4), (27, 29.706664121), (27, 95.999820088), (-27, 95.999820088), (-27, 29.706664121), (-45, 4), (-45, -37.554930795), align=None)
    extrude(amount=BOSS_EXTRUDE16_DEPTH)

    # Sketch39 → Boss-Extrude17 (add)
    with BuildSketch(Plane(origin=(0, 59, 0), x_dir=(1, 0, 0), z_dir=(0, 1, 0))):
        Polygon((55, -59), (45, -37.554930795), (45, 4), (27, 29.706664121), (27, 95.999820088), (-27, 95.999820088), (-27, 29.706664121), (-45, 4), (-45, -37.554930795), (-55, -59), (-55, -93), (-53, -95), (53, -95), (55, -93), align=None)
        Polygon((-43, -37.99832012), (-53, -59.443389325), (-53, -92.171572875), (-52.171572875, -93), (52.171572875, -93), (53, -92.171572875), (53, -59.443389325), (43, -37.99832012), (43, 3.369402422), (25, 29.076066544), (25, 93.999820088), (-25, 93.999820088), (-25, 29.076066544), (-43, 3.369402422), align=None, mode=Mode.SUBTRACT)
    extrude(amount=BOSS_EXTRUDE17_DEPTH)


with BuildPart() as part_1:
    add(part.part)

    add(body_2.part)  # Boss-Extrude18 merges body 2
    # Sketch40 → Boss-Extrude18 (add)
    with BuildSketch(Plane(origin=(0, 30, 0), x_dir=(1, 0, 0), z_dir=(0, 1, 0))):
        with Locations((0, 88.079820088)):
            Rectangle(SKETCH40_W, SKETCH40_H)
    extrude(amount=BOSS_EXTRUDE18_DEPTH)

    # Sketch41 → Boss-Extrude19 (add)
    with BuildSketch(Plane(origin=(0, 0, 0), x_dir=(1, 0, 0), z_dir=(0, 1, 0)).offset(BOSS_EXTRUDE19_START)):
        Polygon((-45.5, -65), (-53, -65), (-55, -67), (-55, -93), (-53, -95), (-45.5, -95), align=None)
        Polygon((45.5, -95), (53, -95), (55, -93), (55, -67), (53, -65), (45.5, -65), align=None)
    extrude(amount=BOSS_EXTRUDE19_DEPTH)

    # Split1 4 outline → Split1 4 (cut)
    with BuildSketch(Plane(origin=(0, 0, 0), x_dir=(1, 0, 0), z_dir=(0, 1, 0)).offset(SPLIT1_START)):
        Polygon((27, 29.706664121), (27, 95.999820088), (-27, 95.999820088), (-27, 29.706664121), (-45, 4), (-45, -37.554930795), (-55, -59), (-55, -93), (-53, -95), (53, -95), (55, -93), (55, -59), (45, -37.554930795), (45, 4), align=None)
    extrude(amount=SPLIT1_4_DEPTH, mode=Mode.SUBTRACT)

    # Split1 5 outline → Split1 5 (cut)
    with BuildSketch(Plane(origin=(0, 0, 0), x_dir=(1, 0, 0), z_dir=(0, 1, 0)).offset(SPLIT1_START_2)):
        Polygon((55, -93), (55, -67), (53, -65), (45.5, -65), (45.5, -95), (53, -95), align=None)
        Polygon((-53, -65), (-55, -67), (-55, -93), (-53, -95), (-45.5, -95), (-45.5, -65), align=None)
    extrude(amount=SPLIT1_5_DEPTH, mode=Mode.SUBTRACT)

    # Sketch43 → Boss-Extrude20 (add)
    with BuildSketch(Plane.XZ):
        Polygon((35.9, -14.996146861), (38.9, -10.711702841), (38.9, -12.711702841), (35.9, -16.996146861), align=None)
    extrude(amount=-BOSS_EXTRUDE20_DEPTH)

    # Sketch45 → CSK for M3 SFHCS1 (revolve, cut)
    with BuildSketch(Plane(origin=(50.5, 0, 91), x_dir=(0, 0, -1), z_dir=(1, 0, 0))):
        Polygon((0, 0), (0, 32), (1.6, 31.03862301), (1.6, 1.76), (3.36, 0), align=None)
    csk_for_m3_sfhcs1 = revolve(axis=Axis((50.5, -6.35, 91), (0, 1, 0)), mode=Mode.SUBTRACT)

    # CSK for M3 SFHCS1 at 2: CSK for M3 SFHCS1 ×2
    with Locations(*[(0, 0, -i * CSK_FOR_M3_SFHCS1_AT_2_PITCH) for i in range(1, CSK_FOR_M3_SFHCS1_AT_2_COUNT)]):
        add(csk_for_m3_sfhcs1, mode=Mode.SUBTRACT)

    # CSK for M3 SFHCS1 at 3: CSK for M3 SFHCS1 ×2
    with Locations(*[Vector(-0.9770889695769172, 0, -0.21283126069992253) * (i * CSK_FOR_M3_SFHCS1_AT_3_PITCH) for i in range(1, CSK_FOR_M3_SFHCS1_AT_3_COUNT)]):
        add(csk_for_m3_sfhcs1, mode=Mode.SUBTRACT)

    # CSK for M3 SFHCS1 at 4: CSK for M3 SFHCS1 ×2
    with Locations(*[(-i * CSK_FOR_M3_SFHCS1_AT_4_PITCH, 0, 0) for i in range(1, CSK_FOR_M3_SFHCS1_AT_4_COUNT)]):
        add(csk_for_m3_sfhcs1, mode=Mode.SUBTRACT)


with BuildPart() as body_2_2:
    # Split1 outline → Split1 (new body)
    with BuildSketch(Plane(origin=(0, 0, 0), x_dir=(1, 0, 0), z_dir=(0, 1, 0)).offset(SPLIT1_START)):
        Polygon((-53, -95), (53, -95), (55, -93), (55, -59), (45, -37.554930795), (45, 4), (27, 29.706664121), (27, 95.999820088), (-27, 95.999820088), (-27, 29.706664121), (-45, 4), (-45, -37.554930795), (-55, -59), (-55, -93), align=None)
    extrude(amount=SPLIT1_DEPTH)

    # Split1 2 outline → Split1 2 (add)
    with BuildSketch(Plane(origin=(0, 0, 0), x_dir=(1, 0, 0), z_dir=(0, 1, 0)).offset(SPLIT1_START_2)):
        Polygon((-45.5, -95), (-45.5, -65), (-53, -65), (-55, -67), (-55, -93), (-53, -95), align=None)
        Polygon((45.5, -65), (45.5, -95), (53, -95), (55, -93), (55, -67), (53, -65), align=None)
    extrude(amount=SPLIT1_2_DEPTH)

    # Split1 3 outline → Split1 3 (add)
    with BuildSketch(Plane(origin=(0, 0, 0), x_dir=(1, 0, 0), z_dir=(0, 1, 0)).offset(SPLIT1_START_3)):
        Polygon((-53, -95), (53, -95), (55, -93), (55, -59), (45, -37.554930795), (45, 4), (27, 29.706664121), (27, 95.999820088), (-27, 95.999820088), (-27, 29.706664121), (-45, 4), (-45, -37.554930795), (-55, -59), (-55, -93), align=None)
        Polygon((-52.171572875, -93), (-53, -92.171572875), (-53, -59.443389325), (-43, -37.99832012), (-43, 3.369402422), (-25, 29.076066544), (-25, 93.999820088), (25, 93.999820088), (25, 29.076066544), (43, 3.369402422), (43, -37.99832012), (53, -59.443389325), (53, -92.171572875), (52.171572875, -93), align=None, mode=Mode.SUBTRACT)
    extrude(amount=SPLIT1_3_DEPTH)


solid = Compound([part_1.part, body_2_2.part])
